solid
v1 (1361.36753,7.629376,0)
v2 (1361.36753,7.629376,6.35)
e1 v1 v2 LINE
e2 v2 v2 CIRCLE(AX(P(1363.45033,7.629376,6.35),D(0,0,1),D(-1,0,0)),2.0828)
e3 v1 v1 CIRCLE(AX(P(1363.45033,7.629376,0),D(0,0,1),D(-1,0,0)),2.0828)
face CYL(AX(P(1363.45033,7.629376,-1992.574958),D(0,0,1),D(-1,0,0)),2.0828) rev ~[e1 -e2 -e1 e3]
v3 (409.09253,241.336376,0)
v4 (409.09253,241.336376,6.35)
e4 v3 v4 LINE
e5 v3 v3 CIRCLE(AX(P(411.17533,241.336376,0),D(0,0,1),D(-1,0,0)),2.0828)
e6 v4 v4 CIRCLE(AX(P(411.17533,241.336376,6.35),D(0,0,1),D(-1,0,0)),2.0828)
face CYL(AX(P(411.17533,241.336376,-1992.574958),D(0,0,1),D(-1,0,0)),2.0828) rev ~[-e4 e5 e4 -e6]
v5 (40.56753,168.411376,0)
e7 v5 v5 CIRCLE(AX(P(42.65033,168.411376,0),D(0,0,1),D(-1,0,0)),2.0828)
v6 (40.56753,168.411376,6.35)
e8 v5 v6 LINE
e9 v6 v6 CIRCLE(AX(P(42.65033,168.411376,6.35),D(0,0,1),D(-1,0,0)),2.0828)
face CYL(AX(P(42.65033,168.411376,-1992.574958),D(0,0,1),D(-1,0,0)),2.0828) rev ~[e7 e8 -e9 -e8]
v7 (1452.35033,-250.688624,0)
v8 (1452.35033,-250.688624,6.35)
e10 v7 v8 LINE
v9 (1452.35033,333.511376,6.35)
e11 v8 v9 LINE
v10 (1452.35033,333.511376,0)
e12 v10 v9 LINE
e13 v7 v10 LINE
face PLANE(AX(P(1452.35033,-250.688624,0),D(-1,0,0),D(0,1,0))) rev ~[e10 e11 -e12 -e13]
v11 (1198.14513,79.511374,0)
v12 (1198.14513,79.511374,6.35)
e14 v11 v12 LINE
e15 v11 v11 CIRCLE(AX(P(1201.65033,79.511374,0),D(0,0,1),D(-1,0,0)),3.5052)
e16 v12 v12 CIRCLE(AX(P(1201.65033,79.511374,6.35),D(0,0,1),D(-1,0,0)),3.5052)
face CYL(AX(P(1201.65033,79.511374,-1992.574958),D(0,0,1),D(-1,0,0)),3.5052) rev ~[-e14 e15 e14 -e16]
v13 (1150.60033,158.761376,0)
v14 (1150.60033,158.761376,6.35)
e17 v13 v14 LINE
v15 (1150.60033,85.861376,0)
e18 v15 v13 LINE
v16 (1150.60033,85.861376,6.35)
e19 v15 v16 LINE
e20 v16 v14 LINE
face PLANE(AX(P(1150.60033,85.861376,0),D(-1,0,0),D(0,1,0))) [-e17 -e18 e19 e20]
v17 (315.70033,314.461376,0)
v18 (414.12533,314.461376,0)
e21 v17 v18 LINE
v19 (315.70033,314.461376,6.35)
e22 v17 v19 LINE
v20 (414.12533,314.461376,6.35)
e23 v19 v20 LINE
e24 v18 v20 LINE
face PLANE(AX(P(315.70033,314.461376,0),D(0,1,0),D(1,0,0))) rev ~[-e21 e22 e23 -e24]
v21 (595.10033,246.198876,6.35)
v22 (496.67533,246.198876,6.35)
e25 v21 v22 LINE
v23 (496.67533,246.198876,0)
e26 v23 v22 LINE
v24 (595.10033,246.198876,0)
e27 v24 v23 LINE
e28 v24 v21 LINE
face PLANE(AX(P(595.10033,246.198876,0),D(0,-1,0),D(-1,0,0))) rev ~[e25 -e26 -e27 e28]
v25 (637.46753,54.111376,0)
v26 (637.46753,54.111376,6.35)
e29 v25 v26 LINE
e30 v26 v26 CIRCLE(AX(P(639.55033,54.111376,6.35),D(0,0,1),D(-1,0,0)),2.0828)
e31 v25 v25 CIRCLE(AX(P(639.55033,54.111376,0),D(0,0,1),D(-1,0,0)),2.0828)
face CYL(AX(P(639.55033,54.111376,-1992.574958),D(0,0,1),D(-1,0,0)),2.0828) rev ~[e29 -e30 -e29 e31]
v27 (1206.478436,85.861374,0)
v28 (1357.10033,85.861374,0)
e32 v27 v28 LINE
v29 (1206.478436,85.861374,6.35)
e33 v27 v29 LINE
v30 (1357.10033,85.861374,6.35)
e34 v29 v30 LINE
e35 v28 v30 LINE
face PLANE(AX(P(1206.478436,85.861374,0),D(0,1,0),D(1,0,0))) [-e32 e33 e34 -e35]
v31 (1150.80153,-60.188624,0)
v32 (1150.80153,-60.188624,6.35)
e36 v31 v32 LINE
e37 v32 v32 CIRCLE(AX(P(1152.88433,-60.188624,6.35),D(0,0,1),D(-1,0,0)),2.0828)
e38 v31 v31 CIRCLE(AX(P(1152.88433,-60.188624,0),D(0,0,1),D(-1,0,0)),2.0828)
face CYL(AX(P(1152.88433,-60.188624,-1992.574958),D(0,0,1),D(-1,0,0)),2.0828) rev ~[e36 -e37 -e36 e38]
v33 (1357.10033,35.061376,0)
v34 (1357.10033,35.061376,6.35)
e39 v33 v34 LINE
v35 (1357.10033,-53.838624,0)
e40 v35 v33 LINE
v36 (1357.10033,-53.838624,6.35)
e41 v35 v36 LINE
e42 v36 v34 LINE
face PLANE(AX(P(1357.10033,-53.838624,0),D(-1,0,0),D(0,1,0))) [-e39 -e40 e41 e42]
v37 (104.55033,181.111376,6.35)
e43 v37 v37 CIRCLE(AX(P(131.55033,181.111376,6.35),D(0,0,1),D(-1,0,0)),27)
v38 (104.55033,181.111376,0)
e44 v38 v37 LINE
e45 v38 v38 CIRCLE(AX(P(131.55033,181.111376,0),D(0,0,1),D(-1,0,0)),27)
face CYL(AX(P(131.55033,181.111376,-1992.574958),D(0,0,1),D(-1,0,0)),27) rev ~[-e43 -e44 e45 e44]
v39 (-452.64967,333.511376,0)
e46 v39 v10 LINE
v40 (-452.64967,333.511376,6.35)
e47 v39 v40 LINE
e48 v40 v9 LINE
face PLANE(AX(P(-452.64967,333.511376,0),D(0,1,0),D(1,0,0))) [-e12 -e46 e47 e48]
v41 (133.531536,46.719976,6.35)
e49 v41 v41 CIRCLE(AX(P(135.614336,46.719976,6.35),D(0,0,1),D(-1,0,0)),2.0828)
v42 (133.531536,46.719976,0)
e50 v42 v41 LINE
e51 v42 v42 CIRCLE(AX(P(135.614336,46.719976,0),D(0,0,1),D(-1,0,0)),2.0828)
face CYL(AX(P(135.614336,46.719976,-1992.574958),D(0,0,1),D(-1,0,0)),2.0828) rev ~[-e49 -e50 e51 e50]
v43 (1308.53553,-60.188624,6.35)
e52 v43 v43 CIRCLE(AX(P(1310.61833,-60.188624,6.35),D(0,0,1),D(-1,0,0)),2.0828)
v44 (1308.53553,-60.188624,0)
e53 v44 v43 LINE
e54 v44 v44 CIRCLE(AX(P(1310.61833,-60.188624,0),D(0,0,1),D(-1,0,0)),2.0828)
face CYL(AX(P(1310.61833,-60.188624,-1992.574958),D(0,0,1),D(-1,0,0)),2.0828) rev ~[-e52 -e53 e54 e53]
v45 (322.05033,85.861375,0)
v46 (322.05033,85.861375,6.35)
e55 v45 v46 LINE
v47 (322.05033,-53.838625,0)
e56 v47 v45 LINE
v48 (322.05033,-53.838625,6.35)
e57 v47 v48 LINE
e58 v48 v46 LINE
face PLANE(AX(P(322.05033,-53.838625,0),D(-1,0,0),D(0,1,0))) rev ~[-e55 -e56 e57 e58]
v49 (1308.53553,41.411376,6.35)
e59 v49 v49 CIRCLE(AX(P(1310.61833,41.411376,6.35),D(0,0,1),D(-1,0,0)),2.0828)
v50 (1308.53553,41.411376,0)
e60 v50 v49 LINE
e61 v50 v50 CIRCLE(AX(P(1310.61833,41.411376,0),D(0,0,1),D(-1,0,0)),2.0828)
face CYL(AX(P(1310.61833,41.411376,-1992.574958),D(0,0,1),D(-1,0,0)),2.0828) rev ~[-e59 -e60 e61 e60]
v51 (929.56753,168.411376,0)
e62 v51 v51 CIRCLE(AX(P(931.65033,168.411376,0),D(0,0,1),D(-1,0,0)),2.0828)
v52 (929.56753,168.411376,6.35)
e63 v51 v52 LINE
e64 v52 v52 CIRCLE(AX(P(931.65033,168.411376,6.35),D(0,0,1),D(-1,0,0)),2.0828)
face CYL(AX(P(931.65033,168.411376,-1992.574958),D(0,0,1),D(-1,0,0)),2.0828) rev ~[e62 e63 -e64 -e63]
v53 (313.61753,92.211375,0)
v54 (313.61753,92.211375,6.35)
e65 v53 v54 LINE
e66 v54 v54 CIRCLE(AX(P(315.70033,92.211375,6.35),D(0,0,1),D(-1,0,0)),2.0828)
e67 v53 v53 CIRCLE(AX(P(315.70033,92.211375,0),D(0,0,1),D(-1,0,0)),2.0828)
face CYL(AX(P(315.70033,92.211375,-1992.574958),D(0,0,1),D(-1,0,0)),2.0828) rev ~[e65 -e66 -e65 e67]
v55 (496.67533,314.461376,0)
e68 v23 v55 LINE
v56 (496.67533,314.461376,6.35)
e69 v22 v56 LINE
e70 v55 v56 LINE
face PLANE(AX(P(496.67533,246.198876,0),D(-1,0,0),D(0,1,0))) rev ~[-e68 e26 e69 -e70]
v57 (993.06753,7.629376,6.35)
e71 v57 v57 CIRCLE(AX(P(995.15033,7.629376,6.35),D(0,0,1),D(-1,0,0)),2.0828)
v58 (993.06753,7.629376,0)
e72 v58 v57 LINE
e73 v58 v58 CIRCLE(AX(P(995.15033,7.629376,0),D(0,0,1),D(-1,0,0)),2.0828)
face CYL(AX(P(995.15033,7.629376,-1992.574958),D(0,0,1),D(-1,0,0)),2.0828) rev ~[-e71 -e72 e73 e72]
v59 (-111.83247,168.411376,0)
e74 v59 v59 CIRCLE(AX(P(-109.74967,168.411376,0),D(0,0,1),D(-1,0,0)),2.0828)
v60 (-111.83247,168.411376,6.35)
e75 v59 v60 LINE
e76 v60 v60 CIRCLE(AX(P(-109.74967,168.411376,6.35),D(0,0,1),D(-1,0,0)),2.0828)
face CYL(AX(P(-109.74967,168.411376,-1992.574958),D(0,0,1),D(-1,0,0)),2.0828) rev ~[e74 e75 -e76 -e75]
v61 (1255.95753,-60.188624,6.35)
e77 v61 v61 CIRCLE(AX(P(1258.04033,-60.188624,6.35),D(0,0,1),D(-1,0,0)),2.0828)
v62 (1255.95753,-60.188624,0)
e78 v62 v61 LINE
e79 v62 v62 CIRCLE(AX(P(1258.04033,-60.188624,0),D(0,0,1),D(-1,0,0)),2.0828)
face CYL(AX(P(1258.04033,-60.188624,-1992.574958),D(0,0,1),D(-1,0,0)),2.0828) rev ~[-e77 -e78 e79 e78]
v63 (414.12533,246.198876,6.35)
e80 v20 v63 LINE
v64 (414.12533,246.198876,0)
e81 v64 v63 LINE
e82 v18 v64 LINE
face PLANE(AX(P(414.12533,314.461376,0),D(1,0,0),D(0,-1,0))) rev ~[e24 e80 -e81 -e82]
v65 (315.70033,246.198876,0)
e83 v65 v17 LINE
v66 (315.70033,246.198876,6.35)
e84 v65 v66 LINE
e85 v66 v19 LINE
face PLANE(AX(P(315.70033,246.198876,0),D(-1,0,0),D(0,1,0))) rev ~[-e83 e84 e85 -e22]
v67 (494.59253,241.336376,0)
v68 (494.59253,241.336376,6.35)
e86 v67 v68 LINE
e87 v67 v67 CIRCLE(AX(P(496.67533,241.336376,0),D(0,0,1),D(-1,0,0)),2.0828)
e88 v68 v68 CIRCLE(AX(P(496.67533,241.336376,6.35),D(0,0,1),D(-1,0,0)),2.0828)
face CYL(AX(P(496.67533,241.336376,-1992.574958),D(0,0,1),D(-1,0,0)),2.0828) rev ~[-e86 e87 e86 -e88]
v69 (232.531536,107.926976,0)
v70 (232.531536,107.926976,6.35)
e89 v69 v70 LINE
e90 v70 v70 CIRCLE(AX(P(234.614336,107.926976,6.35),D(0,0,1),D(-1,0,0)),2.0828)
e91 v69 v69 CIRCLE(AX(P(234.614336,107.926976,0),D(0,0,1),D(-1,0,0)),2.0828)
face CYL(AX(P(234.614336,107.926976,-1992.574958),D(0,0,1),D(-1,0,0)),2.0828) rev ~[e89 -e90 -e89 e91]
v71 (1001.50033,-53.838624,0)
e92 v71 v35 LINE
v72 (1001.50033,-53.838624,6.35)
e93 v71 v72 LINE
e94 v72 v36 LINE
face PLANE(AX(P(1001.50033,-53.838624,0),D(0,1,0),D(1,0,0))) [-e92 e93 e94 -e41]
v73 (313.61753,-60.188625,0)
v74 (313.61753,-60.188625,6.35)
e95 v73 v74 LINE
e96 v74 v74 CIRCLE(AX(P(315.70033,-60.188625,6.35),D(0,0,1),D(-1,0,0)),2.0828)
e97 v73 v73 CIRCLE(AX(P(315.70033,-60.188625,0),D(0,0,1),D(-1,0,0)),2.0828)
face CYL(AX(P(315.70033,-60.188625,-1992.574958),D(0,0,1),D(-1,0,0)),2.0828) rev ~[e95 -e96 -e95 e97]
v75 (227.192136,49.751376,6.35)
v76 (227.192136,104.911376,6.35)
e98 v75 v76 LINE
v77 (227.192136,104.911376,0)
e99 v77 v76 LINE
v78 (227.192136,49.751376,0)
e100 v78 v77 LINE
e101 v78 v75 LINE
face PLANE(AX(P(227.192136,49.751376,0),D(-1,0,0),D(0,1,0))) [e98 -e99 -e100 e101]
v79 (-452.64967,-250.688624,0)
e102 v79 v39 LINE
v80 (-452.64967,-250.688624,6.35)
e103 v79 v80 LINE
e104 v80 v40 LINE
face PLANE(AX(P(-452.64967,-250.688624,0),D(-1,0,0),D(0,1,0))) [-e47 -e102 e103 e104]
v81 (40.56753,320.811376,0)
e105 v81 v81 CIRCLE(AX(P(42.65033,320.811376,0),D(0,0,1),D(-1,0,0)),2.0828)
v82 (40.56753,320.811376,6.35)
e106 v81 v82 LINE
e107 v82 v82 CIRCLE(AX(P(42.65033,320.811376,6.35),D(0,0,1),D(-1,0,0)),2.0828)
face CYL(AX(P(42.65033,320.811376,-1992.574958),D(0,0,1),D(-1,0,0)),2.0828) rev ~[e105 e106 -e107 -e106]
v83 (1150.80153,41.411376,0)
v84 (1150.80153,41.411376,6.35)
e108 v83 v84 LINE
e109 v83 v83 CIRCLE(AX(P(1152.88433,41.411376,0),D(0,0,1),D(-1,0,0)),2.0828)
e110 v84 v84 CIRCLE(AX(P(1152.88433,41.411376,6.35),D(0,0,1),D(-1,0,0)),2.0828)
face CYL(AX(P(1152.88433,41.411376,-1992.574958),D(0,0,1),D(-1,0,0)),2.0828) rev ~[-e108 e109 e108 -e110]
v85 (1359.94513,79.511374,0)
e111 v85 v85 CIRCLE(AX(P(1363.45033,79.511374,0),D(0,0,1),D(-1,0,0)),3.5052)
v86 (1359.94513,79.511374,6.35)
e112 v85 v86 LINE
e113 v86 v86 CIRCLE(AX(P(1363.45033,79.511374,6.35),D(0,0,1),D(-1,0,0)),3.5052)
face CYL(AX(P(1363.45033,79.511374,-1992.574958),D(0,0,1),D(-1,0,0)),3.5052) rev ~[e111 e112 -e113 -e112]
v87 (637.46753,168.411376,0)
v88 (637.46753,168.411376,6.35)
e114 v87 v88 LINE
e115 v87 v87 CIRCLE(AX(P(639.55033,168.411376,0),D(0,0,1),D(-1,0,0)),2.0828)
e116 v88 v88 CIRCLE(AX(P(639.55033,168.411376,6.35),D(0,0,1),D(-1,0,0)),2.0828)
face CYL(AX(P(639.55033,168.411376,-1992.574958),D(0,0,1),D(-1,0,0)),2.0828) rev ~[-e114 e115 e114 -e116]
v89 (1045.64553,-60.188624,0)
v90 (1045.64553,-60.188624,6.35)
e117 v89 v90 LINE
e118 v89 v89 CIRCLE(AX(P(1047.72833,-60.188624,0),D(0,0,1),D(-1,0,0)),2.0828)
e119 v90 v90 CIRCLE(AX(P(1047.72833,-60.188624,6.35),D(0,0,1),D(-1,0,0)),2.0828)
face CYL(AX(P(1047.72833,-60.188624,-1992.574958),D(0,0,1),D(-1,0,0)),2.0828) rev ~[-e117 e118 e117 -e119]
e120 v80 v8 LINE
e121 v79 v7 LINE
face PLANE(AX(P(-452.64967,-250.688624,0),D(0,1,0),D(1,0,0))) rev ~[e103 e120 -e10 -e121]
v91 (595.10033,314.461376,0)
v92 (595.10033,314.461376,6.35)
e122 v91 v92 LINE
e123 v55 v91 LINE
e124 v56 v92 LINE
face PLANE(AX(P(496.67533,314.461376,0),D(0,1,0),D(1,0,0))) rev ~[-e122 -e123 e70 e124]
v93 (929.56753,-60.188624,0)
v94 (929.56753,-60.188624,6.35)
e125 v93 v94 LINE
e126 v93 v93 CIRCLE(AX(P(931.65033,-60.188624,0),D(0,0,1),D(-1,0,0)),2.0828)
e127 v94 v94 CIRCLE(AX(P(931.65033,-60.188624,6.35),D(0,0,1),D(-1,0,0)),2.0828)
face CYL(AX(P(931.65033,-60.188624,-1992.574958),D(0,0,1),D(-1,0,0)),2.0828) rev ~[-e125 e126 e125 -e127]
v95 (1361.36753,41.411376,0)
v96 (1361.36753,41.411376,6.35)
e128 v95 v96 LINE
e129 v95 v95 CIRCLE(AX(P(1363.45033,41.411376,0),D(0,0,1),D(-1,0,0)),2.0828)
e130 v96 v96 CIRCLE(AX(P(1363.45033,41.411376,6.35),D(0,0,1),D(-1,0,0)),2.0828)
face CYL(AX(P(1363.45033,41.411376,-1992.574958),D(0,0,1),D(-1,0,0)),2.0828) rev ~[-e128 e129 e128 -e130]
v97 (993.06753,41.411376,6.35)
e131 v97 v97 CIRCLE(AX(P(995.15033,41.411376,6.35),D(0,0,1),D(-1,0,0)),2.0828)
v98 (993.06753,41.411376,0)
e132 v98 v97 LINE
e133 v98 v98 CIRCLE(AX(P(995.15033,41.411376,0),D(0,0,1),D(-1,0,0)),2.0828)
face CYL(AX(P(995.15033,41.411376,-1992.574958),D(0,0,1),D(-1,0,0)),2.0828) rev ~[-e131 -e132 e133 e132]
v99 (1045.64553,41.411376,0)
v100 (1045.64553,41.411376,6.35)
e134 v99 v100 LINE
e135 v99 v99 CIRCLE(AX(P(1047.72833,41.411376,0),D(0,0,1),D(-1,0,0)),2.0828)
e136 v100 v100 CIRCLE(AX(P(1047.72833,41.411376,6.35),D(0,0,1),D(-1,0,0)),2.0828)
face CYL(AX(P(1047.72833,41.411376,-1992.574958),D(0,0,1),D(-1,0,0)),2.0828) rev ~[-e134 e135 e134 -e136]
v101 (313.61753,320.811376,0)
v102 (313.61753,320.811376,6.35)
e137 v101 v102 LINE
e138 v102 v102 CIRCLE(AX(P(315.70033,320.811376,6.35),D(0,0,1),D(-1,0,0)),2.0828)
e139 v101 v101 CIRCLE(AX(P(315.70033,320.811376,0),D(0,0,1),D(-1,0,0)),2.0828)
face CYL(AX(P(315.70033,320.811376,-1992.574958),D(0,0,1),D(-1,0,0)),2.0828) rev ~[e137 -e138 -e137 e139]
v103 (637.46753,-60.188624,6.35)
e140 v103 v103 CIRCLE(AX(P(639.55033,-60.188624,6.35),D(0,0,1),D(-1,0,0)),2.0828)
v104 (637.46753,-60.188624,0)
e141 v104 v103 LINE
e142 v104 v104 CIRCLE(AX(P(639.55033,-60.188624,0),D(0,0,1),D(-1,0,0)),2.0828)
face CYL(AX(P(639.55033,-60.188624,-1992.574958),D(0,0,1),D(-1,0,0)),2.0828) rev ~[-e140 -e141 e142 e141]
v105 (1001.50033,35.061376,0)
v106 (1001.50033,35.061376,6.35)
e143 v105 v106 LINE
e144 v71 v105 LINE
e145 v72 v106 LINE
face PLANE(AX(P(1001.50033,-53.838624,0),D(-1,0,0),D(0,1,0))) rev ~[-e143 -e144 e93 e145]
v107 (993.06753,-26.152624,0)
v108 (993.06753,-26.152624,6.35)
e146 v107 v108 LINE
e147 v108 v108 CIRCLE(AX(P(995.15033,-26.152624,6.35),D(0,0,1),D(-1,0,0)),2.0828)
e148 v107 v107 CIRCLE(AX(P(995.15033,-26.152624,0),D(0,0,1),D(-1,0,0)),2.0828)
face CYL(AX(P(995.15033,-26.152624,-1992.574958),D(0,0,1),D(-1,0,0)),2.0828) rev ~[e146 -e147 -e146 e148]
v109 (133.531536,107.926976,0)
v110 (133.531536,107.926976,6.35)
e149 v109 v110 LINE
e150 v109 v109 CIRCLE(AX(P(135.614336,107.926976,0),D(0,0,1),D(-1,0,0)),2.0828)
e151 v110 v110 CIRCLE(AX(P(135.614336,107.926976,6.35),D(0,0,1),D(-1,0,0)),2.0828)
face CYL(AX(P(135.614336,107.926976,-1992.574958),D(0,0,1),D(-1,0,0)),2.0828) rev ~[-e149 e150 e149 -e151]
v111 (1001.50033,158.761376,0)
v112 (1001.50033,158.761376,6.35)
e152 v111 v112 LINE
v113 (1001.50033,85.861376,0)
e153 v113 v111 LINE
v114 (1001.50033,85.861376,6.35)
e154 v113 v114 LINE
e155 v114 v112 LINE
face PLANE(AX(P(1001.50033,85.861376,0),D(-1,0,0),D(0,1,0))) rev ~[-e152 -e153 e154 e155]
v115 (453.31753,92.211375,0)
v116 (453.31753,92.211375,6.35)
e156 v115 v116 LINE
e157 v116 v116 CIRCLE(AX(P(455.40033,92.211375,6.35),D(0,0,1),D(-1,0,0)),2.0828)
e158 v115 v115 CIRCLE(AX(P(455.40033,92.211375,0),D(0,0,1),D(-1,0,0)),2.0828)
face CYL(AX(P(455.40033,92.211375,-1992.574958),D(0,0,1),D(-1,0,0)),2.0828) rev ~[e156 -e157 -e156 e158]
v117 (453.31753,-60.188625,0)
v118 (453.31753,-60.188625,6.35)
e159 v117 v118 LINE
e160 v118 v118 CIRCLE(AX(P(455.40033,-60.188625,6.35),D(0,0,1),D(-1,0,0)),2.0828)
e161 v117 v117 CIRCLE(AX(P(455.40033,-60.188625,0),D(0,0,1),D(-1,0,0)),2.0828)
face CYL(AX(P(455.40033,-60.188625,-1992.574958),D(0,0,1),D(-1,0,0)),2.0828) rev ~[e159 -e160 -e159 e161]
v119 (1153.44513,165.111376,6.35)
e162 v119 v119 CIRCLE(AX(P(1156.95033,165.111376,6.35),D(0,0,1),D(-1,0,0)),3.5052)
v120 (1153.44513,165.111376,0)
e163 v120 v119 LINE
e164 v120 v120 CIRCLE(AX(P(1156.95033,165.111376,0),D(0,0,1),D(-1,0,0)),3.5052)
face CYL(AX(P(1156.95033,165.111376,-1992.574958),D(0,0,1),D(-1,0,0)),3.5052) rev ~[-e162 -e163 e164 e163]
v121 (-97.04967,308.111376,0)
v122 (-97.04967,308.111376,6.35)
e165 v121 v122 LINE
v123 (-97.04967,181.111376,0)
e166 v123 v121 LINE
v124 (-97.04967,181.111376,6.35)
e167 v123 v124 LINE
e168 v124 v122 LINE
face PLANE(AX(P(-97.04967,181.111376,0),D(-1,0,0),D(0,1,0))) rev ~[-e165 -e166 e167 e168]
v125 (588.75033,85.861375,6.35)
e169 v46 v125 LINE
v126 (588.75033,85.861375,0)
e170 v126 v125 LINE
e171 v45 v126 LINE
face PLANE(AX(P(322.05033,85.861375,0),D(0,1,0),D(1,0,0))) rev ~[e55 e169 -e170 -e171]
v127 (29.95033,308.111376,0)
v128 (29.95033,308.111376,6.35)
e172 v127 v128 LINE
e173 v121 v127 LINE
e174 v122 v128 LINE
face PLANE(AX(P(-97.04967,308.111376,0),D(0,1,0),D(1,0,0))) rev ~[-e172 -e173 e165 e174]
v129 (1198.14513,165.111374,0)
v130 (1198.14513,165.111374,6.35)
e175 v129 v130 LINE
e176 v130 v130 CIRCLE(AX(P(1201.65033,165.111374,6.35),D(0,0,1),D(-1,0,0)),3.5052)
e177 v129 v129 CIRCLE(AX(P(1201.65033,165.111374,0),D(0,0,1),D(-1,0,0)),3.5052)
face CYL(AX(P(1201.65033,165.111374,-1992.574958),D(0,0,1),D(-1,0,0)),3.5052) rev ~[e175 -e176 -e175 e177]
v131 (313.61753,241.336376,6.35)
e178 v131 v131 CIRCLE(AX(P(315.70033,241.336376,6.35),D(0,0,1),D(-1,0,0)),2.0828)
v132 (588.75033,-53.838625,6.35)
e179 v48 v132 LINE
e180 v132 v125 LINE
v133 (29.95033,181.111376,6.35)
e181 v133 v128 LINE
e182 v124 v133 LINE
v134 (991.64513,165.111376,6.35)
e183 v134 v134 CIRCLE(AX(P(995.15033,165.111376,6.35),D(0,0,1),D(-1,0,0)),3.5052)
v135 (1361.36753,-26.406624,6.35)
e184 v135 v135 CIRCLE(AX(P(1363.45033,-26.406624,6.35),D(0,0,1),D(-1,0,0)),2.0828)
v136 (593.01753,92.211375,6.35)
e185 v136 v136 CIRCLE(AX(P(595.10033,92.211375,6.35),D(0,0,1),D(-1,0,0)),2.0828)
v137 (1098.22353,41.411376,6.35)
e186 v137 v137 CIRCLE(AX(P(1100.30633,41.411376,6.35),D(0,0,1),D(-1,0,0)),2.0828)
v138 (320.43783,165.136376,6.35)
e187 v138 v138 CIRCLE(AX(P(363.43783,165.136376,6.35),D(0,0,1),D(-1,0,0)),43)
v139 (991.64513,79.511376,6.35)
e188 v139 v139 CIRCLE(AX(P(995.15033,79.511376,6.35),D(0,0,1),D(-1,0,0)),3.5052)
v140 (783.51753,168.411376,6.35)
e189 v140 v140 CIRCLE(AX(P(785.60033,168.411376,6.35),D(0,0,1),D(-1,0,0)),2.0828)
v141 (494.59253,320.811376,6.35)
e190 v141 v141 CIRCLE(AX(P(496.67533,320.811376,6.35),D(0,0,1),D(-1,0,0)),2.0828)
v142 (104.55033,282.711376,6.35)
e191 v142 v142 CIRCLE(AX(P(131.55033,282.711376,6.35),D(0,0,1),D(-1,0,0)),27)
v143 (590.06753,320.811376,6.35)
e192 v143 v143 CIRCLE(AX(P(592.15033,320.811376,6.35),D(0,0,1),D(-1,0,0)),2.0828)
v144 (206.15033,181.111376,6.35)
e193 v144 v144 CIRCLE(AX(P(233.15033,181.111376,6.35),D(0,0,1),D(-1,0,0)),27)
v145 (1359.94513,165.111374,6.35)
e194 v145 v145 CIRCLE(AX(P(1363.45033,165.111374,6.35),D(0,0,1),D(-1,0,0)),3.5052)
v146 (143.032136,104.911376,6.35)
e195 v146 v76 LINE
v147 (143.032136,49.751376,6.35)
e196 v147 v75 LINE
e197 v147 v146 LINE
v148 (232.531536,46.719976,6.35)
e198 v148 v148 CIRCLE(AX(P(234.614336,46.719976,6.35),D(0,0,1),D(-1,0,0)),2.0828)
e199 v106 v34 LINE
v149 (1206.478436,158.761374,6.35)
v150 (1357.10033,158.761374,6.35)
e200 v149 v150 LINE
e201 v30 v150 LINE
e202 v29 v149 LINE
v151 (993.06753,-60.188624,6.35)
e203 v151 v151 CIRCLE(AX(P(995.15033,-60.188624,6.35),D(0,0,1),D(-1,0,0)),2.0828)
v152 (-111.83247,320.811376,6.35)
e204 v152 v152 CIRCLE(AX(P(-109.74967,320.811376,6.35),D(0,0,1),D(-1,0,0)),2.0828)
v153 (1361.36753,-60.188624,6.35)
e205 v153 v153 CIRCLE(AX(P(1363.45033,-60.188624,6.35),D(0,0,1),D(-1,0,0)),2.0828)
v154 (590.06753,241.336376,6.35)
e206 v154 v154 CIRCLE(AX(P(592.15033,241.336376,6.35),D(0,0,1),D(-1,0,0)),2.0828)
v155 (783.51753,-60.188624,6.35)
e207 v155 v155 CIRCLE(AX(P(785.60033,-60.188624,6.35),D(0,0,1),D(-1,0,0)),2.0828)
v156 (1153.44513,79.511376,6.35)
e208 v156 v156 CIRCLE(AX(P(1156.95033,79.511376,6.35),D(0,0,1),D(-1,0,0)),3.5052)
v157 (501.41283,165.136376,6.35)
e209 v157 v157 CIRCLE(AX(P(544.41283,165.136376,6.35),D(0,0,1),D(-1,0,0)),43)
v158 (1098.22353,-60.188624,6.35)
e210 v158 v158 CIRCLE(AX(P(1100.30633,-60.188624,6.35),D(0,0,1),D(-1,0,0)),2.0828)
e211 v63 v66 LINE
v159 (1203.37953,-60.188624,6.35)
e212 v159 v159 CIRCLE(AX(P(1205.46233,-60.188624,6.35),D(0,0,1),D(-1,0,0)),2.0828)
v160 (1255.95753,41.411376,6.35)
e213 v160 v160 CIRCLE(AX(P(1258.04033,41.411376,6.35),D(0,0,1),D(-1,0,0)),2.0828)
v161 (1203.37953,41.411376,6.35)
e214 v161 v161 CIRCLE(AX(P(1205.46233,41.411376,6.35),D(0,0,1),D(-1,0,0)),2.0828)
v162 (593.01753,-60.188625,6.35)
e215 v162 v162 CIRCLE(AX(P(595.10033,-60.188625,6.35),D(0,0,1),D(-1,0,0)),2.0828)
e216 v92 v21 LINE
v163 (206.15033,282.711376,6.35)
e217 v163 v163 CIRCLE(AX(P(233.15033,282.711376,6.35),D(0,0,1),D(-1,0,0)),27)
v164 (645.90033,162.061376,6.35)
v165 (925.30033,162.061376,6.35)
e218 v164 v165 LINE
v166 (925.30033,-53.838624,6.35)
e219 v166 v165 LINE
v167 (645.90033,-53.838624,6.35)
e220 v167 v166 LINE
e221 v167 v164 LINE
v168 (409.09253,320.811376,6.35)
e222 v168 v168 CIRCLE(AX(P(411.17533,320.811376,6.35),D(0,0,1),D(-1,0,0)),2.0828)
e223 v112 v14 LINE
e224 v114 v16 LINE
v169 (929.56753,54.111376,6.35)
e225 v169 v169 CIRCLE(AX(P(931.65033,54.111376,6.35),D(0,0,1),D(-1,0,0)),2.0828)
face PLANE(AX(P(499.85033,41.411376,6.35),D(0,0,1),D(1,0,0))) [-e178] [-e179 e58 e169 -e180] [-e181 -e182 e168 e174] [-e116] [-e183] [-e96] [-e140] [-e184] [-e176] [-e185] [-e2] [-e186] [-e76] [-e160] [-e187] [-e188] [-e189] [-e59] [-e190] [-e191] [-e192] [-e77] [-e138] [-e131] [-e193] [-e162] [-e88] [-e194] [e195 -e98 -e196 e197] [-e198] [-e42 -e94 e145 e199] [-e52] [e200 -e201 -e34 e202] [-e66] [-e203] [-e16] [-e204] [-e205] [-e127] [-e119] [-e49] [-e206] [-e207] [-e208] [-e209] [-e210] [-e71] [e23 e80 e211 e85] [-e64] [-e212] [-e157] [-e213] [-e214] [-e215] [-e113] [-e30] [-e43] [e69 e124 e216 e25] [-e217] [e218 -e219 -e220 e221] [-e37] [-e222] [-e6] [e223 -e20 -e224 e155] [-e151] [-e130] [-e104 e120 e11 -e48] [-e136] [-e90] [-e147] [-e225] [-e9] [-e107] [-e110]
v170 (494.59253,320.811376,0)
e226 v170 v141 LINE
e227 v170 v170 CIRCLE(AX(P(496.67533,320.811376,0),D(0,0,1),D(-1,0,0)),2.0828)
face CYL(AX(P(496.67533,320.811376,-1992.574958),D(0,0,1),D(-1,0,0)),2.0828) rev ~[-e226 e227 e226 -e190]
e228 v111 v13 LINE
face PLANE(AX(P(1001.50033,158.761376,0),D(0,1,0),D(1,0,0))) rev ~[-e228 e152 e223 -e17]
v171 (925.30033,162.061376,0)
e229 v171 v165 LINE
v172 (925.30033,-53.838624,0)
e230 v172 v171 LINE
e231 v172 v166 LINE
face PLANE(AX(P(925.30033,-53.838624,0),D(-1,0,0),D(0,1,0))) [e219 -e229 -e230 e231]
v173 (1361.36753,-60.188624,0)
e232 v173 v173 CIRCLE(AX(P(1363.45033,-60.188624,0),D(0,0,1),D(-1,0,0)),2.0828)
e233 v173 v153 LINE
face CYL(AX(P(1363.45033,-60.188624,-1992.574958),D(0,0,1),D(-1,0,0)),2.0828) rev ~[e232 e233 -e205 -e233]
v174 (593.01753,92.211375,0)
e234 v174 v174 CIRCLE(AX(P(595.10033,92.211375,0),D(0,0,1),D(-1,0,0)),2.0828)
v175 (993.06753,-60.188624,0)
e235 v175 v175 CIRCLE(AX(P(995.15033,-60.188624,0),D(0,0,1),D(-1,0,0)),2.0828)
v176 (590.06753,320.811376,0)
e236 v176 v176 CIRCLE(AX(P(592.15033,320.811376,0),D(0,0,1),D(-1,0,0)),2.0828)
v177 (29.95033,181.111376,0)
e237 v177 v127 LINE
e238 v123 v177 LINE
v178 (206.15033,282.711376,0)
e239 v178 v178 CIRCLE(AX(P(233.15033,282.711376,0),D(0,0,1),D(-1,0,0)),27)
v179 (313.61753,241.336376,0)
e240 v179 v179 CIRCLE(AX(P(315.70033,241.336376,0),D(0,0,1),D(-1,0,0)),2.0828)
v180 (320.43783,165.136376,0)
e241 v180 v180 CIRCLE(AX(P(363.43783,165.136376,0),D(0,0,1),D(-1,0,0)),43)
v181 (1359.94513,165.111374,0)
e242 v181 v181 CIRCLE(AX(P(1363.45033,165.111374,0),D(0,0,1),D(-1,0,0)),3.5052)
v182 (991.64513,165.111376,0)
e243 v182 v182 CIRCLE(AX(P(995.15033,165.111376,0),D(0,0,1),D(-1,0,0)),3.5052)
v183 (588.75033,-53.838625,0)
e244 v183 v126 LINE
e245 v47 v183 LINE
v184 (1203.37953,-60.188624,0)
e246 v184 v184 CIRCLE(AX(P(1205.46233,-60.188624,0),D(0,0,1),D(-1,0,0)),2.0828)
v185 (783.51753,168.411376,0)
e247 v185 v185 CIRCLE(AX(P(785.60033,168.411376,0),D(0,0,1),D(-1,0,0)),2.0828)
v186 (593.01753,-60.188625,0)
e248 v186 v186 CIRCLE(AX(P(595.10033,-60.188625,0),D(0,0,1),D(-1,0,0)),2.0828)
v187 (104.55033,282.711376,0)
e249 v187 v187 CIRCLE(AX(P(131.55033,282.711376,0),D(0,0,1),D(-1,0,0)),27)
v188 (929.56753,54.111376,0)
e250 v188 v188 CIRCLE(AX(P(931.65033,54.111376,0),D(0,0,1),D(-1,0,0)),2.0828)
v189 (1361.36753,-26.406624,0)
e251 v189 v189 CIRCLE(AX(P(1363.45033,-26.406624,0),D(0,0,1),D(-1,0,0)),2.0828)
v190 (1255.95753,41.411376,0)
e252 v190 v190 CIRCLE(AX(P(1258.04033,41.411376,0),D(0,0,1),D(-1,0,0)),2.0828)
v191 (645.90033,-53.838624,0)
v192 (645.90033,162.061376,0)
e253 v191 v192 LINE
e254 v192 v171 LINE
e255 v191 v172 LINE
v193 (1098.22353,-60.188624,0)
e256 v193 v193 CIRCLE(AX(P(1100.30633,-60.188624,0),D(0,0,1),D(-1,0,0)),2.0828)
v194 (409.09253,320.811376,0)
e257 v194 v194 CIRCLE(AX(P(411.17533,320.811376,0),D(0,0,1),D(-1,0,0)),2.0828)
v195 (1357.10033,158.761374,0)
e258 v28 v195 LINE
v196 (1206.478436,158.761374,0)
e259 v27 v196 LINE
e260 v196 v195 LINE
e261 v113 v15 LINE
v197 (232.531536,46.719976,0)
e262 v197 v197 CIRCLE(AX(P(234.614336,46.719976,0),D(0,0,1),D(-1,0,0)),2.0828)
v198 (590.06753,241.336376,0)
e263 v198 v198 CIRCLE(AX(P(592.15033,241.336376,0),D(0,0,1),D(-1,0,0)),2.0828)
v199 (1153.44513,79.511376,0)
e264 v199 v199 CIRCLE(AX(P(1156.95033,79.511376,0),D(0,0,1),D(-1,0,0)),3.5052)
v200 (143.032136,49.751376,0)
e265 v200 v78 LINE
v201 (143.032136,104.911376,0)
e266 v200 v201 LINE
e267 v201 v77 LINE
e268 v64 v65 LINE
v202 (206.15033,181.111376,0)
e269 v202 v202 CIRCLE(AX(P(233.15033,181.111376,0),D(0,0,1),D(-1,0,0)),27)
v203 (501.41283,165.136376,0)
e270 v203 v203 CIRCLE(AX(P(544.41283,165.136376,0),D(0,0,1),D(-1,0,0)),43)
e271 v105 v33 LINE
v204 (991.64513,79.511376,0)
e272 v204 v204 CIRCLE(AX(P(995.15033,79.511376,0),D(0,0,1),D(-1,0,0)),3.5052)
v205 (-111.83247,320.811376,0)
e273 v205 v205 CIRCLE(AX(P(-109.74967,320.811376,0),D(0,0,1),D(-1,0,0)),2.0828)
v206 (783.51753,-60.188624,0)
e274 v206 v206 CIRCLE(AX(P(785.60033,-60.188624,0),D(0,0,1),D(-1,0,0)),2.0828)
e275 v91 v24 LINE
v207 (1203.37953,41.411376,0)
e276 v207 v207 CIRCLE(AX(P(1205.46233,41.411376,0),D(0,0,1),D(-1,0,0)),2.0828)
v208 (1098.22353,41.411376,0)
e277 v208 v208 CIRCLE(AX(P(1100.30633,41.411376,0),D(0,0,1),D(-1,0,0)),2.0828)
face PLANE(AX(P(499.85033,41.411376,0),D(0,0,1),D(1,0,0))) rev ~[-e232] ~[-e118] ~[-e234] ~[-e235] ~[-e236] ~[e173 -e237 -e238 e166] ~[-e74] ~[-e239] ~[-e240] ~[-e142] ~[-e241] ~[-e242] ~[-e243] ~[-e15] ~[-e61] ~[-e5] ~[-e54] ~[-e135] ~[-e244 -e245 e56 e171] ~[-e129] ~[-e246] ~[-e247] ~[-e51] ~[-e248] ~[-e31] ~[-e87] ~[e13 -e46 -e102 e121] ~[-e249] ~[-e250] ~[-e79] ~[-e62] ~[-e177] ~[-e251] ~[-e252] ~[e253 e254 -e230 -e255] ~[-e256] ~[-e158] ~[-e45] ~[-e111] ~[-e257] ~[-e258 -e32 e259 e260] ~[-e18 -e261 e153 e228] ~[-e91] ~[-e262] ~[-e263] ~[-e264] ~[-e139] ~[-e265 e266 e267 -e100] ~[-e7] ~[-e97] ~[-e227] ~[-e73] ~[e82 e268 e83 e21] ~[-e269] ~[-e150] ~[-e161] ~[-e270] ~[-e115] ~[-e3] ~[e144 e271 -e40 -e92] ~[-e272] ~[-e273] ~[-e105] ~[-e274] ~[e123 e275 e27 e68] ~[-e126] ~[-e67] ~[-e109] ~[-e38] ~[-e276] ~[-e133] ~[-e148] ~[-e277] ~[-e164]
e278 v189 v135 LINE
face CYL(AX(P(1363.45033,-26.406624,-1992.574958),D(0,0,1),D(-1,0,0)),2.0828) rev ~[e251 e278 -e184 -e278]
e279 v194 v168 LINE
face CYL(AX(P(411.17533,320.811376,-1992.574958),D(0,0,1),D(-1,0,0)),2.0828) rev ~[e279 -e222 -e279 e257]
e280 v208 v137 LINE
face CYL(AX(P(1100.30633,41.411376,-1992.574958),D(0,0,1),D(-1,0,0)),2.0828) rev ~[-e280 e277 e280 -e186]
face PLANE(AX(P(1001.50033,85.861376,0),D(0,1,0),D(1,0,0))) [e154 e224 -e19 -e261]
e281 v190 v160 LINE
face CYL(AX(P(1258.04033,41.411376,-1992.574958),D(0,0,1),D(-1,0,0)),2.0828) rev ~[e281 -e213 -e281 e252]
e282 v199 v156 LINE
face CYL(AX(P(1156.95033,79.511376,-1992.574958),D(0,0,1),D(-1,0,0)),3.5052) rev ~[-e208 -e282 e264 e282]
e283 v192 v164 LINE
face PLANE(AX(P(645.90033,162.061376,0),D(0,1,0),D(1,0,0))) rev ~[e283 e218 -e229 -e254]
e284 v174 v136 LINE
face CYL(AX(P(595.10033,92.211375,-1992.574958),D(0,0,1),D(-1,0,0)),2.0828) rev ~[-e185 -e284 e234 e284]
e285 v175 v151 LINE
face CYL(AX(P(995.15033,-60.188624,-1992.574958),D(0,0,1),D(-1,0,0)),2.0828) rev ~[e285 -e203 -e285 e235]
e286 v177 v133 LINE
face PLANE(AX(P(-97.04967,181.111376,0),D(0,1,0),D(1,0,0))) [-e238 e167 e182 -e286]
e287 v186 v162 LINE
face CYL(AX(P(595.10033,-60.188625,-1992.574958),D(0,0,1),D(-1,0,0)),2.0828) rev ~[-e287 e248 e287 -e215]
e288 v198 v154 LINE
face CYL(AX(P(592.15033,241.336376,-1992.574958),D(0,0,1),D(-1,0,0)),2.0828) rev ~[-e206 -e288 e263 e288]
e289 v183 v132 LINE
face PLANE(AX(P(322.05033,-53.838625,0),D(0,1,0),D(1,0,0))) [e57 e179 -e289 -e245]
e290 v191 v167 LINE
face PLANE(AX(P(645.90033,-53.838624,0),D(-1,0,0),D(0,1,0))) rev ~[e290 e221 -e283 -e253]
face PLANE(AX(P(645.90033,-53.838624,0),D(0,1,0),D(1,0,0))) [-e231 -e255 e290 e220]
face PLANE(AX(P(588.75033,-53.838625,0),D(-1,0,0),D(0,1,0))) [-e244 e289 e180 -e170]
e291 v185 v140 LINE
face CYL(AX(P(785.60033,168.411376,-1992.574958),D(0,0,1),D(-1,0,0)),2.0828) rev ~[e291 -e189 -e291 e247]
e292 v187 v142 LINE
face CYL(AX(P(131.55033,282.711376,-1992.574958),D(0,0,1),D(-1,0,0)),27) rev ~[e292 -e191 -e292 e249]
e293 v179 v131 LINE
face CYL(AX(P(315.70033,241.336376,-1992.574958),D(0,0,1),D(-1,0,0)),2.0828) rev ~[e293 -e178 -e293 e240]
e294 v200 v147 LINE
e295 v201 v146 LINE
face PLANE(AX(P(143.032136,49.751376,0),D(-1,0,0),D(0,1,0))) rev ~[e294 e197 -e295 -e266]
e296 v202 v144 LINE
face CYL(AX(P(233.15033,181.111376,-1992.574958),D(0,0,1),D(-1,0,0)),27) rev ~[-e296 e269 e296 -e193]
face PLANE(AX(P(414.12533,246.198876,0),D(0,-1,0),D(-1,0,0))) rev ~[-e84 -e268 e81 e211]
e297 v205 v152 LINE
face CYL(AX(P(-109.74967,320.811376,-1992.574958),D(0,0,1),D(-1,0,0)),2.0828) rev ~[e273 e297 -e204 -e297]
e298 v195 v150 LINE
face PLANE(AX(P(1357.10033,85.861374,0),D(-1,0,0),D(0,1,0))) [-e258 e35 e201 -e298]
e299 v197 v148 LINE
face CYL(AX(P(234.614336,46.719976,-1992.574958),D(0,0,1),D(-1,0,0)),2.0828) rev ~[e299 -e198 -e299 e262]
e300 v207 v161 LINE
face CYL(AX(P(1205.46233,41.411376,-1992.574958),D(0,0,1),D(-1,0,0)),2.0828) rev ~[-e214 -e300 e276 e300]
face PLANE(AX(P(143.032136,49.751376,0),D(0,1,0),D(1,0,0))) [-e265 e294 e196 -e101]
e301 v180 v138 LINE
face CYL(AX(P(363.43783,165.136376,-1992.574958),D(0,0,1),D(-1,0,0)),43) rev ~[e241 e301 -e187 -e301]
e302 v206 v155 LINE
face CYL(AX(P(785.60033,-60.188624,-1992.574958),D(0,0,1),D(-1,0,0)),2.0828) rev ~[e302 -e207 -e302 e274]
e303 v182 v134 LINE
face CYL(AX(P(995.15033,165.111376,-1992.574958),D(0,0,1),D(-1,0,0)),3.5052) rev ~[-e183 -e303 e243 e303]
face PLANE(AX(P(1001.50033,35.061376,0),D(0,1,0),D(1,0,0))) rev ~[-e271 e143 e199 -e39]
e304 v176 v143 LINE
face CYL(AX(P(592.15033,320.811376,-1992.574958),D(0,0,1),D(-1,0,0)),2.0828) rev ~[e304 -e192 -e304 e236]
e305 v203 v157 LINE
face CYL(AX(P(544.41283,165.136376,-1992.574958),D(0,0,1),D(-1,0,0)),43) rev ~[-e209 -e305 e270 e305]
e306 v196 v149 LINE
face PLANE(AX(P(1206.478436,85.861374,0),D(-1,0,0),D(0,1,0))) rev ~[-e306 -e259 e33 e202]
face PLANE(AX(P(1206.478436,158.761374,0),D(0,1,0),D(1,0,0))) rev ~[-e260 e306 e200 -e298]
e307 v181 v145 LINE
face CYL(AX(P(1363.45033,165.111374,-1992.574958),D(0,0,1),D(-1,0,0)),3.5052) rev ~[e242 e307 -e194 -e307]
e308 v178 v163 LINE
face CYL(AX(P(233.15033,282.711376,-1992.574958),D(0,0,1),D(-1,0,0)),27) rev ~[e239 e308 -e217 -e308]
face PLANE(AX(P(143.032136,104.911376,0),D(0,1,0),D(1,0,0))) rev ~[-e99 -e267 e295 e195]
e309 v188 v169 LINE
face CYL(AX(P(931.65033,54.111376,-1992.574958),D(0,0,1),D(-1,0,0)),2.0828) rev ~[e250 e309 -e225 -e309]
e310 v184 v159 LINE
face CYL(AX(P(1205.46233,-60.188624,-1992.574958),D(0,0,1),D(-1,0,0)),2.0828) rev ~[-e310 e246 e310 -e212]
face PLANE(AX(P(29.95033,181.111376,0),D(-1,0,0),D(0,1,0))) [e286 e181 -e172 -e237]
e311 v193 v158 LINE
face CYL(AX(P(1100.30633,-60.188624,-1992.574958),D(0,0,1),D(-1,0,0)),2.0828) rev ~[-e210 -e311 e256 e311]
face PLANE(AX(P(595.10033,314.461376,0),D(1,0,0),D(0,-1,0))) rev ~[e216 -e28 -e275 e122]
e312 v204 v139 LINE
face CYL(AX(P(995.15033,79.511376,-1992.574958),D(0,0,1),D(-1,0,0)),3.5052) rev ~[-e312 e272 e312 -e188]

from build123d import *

# Parameters (mm, degrees)
F0_W     = 1905
F0_H     = 584.2
F0_W_2   = 279.4
F0_H_2   = 152.4
F0_W_3   = 368.3
F0_H_3   = 101.6
F0_W_4   = 84.16
F0_H_4   = 55.16
F0_W_5   = 127
F0_H_5   = 127
F0_W_6   = 161.8
F0_H_6   = 85.6
F0_W_7   = 355.6
F0_H_7   = 88.9
F0_H_8   = 215.9
F0_W_8   = 266.7
F0_H_9   = 139.7
F0_W_9   = 149.1
F0_H_10  = 72.9
F0_W_10  = 150.6218942523
F0_W_11  = 95.475
F0_H_11  = 6.35
F0_H_12  = 4.8625
F1_DEPTH = 6.35
F2_D     = 4.1656
F3_D     = 7.0104
F4_D     = 54
F5_D     = 86


# Not quite as in the source:
# - a feature names something its author has since deleted; it is built from what else it names


with BuildPart() as f1:
    # F0 (on Top) → F1 (new body)
    with BuildSketch(Plane.XY):
        with Locations((499.8503303409, 41.4113755345)):
            Rectangle(F0_W, F0_H)
        with Locations((455.4003303409, 16.0113749921)):
            Rectangle(F0_W_2, F0_H_2, mode=Mode.SUBTRACT)
        with Locations((1179.3003303409, -9.3886244655)):
            Rectangle(F0_W_3, F0_H_3, mode=Mode.SUBTRACT)
        with Locations((185.112135537, 77.3313755345)):
            Rectangle(F0_W_4, F0_H_4, mode=Mode.SUBTRACT)
        with Locations((-33.5496696591, 244.6113755345)):
            Rectangle(F0_W_5, F0_H_5, mode=Mode.SUBTRACT)
        Polygon((315.7003303409, 314.4613755345), (315.7003303409, 320.8113755345), (411.1753303409, 320.8113755345), (411.1753303409, 314.4613755345), (414.1253303409, 314.4613755345), (414.1253303409, 246.1988755345), (411.1753303409, 246.1988755345), (411.1753303409, 241.3363755345), (315.7003303409, 241.3363755345), (315.7003303409, 246.1988755345), align=None, mode=Mode.SUBTRACT)
        Polygon((639.5503303409, 54.1113755345), (639.5503303409, 168.4113755345), (931.6503303409, 168.4113755345), (931.6503303409, -60.1886244655), (785.6003303409, -60.1886244655), (639.5503303409, -60.1886244655), align=None, mode=Mode.SUBTRACT)
        with Locations((1076.0503303409, 122.3113755345)):
            Rectangle(F0_W_6, F0_H_6, mode=Mode.SUBTRACT)
        with Locations((1282.5503303409, 122.3113742352)):
            Rectangle(F0_W_6, F0_H_6, mode=Mode.SUBTRACT)
        Polygon((496.6753303409, 314.4613755345), (496.6753303409, 320.8113755345), (592.1503303409, 320.8113755345), (592.1503303409, 314.4613755345), (595.1003303409, 314.4613755345), (595.1003303409, 246.1988755345), (592.1503303409, 246.1988755345), (592.1503303409, 241.3363755345), (496.6753303409, 241.3363755345), (496.6753303409, 246.1988755345), align=None, mode=Mode.SUBTRACT)
        with Locations((1179.3003303409, -9.3886244655)):
            Rectangle(F0_W_3, F0_H_3)
        with Locations((1179.3003303409, -9.3886244655)):
            Rectangle(F0_W_7, F0_H_7, mode=Mode.SUBTRACT)
        Polygon((931.6503303409, 168.4113755345), (639.5503303409, 168.4113755345), (639.5503303409, 54.1113755345), (639.5503303409, -60.1886244655), (785.6003303409, -60.1886244655), (931.6503303409, -60.1886244655), align=None)
        with Locations((785.6003303409, 54.1113755345)):
            Rectangle(F0_W_2, F0_H_8, mode=Mode.SUBTRACT)
        with Locations((455.4003303409, 16.0113749921)):
            Rectangle(F0_W_2, F0_H_2)
        with Locations((455.4003303409, 16.0113749921)):
            Rectangle(F0_W_8, F0_H_9, mode=Mode.SUBTRACT)
        with Locations((1076.0503303409, 122.3113755345)):
            Rectangle(F0_W_6, F0_H_6)
        with Locations((1076.0503303409, 122.3113755345)):
            Rectangle(F0_W_9, F0_H_10, mode=Mode.SUBTRACT)
        with Locations((1282.5503303409, 122.3113742352)):
            Rectangle(F0_W_6, F0_H_6)
        with Locations((1281.7893832147, 122.3113742352)):
            Rectangle(F0_W_10, F0_H_10, mode=Mode.SUBTRACT)
        with Locations((363.4378303409, 317.6363755345)):
            Rectangle(F0_W_11, F0_H_11)
        with Locations((363.4378303409, 243.7676255345)):
            Rectangle(F0_W_11, F0_H_12)
        with Locations((544.4128303409, 317.6363755345)):
            Rectangle(F0_W_11, F0_H_11)
        with Locations((544.4128303409, 243.7676255345)):
            Rectangle(F0_W_11, F0_H_12)
    extrude(amount=F1_DEPTH)

    # F2 (through all)
    with Locations(Plane(origin=(0, 0, 0), x_dir=(1, 0, 0), z_dir=(0, 0, -1))):
        with Locations((995.1503303409, -41.4113755345), (995.1503303409, -7.6293755345), (995.1503303409, 26.1526244655), (995.1503303409, 60.1886244655), (1047.7283303409, 60.1886244655), (1100.3063303409, 60.1886244655), (1152.8843303409, 60.1886244655), (1205.4623303409, 60.1886244655), (1258.0403303409, 60.1886244655), (1310.6183303409, 60.1886244655), (1363.4503303409, 60.1886244655), (1363.4503303409, 26.4066244655), (1363.4503303409, -7.6293755345), (1363.4503303409, -41.4113755345), (1310.6183303409, -41.4113755345), (1258.0403303409, -41.4113755345), (1205.4623303409, -41.4113755345), (1152.8843303409, -41.4113755345), (1100.3063303409, -41.4113755345), (1047.7283303409, -41.4113755345), (639.5503303409, -168.4113755345), (785.6003303409, -168.4113755345), (931.6503303409, -168.4113755345), (931.6503303409, -54.1113755345), (931.6503303409, 60.1886244655), (785.6003303409, 60.1886244655), (639.5503303409, 60.1886244655), (639.5503303409, -54.1113755345), (315.7003303409, -92.2113749921), (455.4003303409, -92.2113749921), (595.1003303409, -92.2113749921), (595.1003303409, 60.1886250079), (455.4003303409, 60.1886250079), (315.7003303409, 60.1886250079), (315.7003303409, -320.8113755345), (411.1753303409, -320.8113755345), (411.1753303409, -241.3363755345), (315.7003303409, -241.3363755345), (496.6753303409, -320.8113755345), (496.6753303409, -241.3363755345), (592.1503303409, -241.3363755345), (592.1503303409, -320.8113755345), (135.614335537, -107.9269755345), (234.614335537, -107.9269755345), (234.614335537, -46.7199755345), (135.614335537, -46.7199755345), (-109.7496696591, -320.8113755345), (-109.7496696591, -168.4113755345), (42.6503303409, -168.4113755345), (42.6503303409, -320.8113755345)):
            Hole(F2_D / 2)

    # F3 (through all)
    with Locations(Plane(origin=(0, 0, 0), x_dir=(1, 0, 0), z_dir=(0, 0, -1))):
        with Locations((995.1503303409, -165.1113755345), (995.1503303409, -79.5113755345), (1156.9503303409, -79.5113755345), (1156.9503303409, -165.1113755345), (1201.6503303409, -165.1113742352), (1201.6503303409, -79.5113742352), (1363.4503303409, -79.5113742352), (1363.4503303409, -165.1113742352)):
            Hole(F3_D / 2)

    # F4 (through all)
    with Locations(Plane(origin=(0, 0, 0), x_dir=(1, 0, 0), z_dir=(0, 0, -1))):
        with Locations((233.1503303409, -181.1113755345), (233.1503303409, -282.7113755345), (131.5503303409, -181.1113755345), (131.5503303409, -282.7113755345)):
            Hole(F4_D / 2)

    # F5 (through all)
    with Locations(Plane(origin=(0, 0, 0), x_dir=(1, 0, 0), z_dir=(0, 0, -1))):
        with Locations((363.4378303409, -165.1363755345), (544.4128303409, -165.1363755345)):
            Hole(F5_D / 2)


solid = f1.part
